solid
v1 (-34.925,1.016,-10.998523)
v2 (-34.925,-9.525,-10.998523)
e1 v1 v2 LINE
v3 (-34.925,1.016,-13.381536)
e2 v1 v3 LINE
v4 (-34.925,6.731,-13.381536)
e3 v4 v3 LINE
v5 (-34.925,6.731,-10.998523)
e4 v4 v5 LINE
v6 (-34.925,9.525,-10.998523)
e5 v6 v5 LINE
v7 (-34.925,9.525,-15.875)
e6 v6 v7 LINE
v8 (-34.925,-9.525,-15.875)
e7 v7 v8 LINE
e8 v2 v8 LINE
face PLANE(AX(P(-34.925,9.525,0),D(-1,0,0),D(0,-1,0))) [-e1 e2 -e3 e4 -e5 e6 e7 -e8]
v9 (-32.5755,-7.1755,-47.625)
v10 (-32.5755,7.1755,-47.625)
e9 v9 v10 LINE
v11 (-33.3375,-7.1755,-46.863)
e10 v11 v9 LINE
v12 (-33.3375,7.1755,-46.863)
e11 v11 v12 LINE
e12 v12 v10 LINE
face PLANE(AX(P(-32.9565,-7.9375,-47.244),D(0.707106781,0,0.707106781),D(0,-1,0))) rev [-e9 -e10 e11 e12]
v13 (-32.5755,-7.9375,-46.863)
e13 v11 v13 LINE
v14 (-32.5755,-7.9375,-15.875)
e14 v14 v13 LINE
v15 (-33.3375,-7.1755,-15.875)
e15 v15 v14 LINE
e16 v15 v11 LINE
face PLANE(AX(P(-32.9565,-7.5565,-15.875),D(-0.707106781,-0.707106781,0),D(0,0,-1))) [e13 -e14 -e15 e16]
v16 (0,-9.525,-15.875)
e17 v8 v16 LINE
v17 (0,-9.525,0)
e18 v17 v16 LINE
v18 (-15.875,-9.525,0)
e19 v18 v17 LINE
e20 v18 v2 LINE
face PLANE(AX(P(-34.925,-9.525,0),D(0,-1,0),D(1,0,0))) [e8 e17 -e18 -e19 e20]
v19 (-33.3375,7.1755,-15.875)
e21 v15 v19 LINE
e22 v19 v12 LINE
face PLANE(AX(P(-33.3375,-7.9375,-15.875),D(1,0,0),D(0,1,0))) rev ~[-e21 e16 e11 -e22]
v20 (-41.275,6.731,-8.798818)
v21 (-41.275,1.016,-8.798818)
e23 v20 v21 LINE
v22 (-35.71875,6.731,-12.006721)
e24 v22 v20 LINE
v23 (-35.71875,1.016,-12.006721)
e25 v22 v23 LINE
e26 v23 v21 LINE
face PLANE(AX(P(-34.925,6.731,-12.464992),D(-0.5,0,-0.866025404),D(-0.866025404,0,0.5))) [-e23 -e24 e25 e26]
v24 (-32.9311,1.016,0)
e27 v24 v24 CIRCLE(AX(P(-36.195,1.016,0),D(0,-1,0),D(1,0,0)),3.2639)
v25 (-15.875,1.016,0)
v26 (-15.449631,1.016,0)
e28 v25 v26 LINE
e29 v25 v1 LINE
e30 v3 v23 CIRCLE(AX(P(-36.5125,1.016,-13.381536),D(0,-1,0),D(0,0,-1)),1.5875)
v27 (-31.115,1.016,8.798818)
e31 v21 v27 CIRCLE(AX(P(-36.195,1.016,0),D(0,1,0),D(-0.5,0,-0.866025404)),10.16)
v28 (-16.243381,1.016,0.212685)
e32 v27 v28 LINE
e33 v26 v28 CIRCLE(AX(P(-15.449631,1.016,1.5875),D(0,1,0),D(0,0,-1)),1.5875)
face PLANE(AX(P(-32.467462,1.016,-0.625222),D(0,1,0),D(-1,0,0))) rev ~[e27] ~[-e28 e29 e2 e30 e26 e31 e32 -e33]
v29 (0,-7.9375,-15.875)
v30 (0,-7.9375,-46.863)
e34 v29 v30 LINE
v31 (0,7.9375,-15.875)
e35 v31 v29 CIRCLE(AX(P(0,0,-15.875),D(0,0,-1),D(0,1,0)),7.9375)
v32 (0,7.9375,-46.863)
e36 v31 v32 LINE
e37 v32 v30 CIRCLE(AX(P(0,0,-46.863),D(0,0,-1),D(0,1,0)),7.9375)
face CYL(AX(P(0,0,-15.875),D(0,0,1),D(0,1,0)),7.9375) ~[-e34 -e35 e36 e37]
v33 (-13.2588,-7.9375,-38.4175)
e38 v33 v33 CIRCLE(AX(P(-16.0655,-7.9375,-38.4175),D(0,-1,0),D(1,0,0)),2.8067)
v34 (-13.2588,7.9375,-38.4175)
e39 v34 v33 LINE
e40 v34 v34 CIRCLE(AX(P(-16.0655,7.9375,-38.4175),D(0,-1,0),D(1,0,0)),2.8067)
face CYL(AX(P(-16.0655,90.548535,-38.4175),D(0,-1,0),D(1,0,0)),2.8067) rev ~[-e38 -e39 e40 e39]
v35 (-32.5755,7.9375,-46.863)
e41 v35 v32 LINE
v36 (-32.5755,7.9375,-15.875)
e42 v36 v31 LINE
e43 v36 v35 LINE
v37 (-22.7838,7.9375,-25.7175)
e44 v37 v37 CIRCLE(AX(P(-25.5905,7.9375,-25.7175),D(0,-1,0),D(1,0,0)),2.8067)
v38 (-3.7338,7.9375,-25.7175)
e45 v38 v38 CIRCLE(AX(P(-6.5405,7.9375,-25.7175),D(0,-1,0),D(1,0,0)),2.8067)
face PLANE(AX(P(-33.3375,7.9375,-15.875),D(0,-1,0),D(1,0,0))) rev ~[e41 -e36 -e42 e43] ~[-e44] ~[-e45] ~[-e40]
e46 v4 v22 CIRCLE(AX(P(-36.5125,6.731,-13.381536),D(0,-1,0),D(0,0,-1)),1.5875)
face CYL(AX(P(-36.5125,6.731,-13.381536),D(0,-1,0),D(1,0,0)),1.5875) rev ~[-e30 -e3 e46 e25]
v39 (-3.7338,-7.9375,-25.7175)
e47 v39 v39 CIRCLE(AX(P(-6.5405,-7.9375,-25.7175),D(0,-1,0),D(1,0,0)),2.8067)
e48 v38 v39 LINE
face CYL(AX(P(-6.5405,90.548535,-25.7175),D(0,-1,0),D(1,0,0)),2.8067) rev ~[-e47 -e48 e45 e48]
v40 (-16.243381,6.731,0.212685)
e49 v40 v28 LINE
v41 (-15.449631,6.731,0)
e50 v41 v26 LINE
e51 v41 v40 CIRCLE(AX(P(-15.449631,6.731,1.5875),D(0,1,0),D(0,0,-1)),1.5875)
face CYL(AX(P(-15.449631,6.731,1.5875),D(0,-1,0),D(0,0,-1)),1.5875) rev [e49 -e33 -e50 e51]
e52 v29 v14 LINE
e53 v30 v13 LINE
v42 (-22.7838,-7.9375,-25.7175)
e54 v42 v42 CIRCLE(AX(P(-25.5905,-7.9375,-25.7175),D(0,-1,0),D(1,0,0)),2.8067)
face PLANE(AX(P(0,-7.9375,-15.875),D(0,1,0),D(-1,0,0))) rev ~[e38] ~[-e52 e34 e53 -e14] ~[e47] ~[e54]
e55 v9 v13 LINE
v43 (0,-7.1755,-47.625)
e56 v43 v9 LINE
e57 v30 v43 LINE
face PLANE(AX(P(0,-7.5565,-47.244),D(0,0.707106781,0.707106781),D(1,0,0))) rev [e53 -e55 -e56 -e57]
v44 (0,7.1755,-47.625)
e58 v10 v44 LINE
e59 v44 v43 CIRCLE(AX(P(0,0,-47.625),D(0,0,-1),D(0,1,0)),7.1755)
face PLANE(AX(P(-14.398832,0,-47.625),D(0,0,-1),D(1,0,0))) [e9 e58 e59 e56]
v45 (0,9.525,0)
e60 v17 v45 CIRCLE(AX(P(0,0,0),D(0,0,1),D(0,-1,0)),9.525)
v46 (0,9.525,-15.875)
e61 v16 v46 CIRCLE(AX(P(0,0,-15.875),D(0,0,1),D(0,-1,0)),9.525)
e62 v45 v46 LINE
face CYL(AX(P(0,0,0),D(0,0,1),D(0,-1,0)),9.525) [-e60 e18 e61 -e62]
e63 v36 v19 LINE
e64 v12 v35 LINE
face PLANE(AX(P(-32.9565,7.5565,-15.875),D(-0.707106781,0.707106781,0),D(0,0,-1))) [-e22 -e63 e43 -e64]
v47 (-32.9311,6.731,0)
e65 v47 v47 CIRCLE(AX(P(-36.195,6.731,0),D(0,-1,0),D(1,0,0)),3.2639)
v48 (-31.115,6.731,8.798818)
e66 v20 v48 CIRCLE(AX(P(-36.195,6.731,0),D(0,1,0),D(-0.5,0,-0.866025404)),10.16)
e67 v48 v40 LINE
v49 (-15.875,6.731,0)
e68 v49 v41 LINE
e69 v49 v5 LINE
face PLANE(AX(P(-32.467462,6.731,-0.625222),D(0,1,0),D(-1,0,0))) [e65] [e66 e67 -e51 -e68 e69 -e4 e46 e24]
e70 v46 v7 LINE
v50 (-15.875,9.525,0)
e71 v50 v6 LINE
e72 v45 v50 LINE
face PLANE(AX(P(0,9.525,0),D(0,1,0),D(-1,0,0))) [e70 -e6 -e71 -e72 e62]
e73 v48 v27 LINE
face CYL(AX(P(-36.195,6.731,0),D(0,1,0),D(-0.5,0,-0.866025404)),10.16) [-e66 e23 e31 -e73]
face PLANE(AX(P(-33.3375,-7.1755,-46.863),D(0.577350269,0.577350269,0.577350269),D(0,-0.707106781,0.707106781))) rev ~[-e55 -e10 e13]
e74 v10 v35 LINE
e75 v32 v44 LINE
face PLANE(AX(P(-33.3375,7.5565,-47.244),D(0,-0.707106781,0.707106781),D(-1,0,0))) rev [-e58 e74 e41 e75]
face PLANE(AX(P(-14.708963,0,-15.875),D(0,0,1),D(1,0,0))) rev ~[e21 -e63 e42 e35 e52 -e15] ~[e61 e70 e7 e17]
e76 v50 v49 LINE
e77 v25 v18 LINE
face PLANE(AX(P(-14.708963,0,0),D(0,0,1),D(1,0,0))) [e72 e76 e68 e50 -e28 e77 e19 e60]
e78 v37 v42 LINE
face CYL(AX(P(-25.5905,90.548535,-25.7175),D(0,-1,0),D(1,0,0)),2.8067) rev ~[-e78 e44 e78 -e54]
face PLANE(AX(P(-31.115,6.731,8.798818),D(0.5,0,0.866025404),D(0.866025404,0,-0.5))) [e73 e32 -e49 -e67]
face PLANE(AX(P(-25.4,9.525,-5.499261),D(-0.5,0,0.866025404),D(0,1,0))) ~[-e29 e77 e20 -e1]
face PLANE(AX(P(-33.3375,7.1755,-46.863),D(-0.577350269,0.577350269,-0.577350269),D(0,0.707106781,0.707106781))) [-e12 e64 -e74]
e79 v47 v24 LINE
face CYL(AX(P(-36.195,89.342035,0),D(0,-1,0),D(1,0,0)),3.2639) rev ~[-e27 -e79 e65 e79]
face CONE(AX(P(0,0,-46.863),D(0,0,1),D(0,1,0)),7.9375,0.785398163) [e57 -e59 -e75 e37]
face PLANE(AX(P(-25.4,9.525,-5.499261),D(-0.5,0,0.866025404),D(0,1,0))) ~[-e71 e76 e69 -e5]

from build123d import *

# Parameters (mm, degrees)
F1_DEPTH = 15.875
F3_DEPTH = 31.75
F4_SIZE2 = 10.9985226281
F4_SIZE  = 19.05
F6_START = -2.794
F6_DEPTH = 5.715
F8_D     = 6.5278
F9_SIZE  = 0.762
F11_D    = 5.6134
F12_R    = 1.5875


with BuildPart() as f1:
    # F0 (on Top) → F1 (new body)
    with BuildSketch(Plane.XY):
        with BuildLine():
            Line((0, 9.525), (-34.925, 9.525))
            Line((-34.925, 9.525), (-34.925, -9.525))
            Line((-34.925, -9.525), (0, -9.525))
            ThreePointArc((0, -9.525), (9.525, 0), (0, 9.525))
        make_face()
    extrude(amount=-F1_DEPTH)

    # F2 (on face) → F3 (join)
    with BuildSketch(Plane(origin=(0, 0, -15.875), x_dir=(1, 0, 0), z_dir=(0, 0, -1))):
        with BuildLine():
            Line((0, 7.9375), (-33.3375, 7.9375))
            Line((-33.3375, 7.9375), (-33.3375, -7.9375))
            Line((-33.3375, -7.9375), (0, -7.9375))
            ThreePointArc((0, -7.9375), (7.9375, 0), (0, 7.9375))
        make_face()
    extrude(amount=F3_DEPTH)

    # F4
    f4_edges = [f1.edges().sort_by_distance(p)[0] for p in [
        (-34.925, 0, 0),
    ]]
    f4_side = f1.faces().sort_by_distance((-13.668751, 0, 0))[0]
    chamfer(f4_edges, length=F4_SIZE, length2=F4_SIZE2, reference=f4_side)

    # F5 (on face) → F6 (join)
    with BuildSketch(Plane(origin=(0, 9.525, 0), x_dir=(-1, 0, 0), z_dir=(0, 1, 0)).offset(F6_START)):
        with BuildLine():
            Line((34.925, -12.4649923118), (41.275, -8.7988181024))
            ThreePointArc((41.275, -8.7988181024), (44.9938181024, 5.08), (31.115, 8.7988181024))
            Line((31.115, 8.7988181024), (15.875, 0))
            Line((15.875, 0), (34.925, -10.9985226281))
            Line((34.925, -10.9985226281), (34.925, -12.4649923118))
        make_face()
    extrude(amount=-F6_DEPTH)

    # F8 (through all)
    with Locations(Plane(origin=(0, 6.731, 0), x_dir=(-1, 0, 0), z_dir=(0, 1, 0))):
        with Locations((36.195, 0)):
            Hole(F8_D / 2)

    # F9
    f9_edges = [f1.edges().sort_by_distance(p)[0] for p in [
        (-16.66875, -7.9375, -47.625),
        (-33.3375, 0, -47.625),
        (-33.3375, -7.9375, -31.75),
        (-33.3375, 7.9375, -31.75),
        (7.9375, 0, -47.625),
        (-16.66875, 7.9375, -47.625),
    ]]
    chamfer(f9_edges, length=F9_SIZE)

    # F11 (through all)
    with Locations(Plane(origin=(0, 7.9375, 0), x_dir=(-1, 0, 0), z_dir=(0, 1, 0))):
        with Locations((25.5905, -25.7175), (6.5405, -25.7175), (16.0655, -38.4175)):
            Hole(F11_D / 2)

    # F12
    f12_edges = [f1.edges().sort_by_distance(p)[0] for p in [
        (-15.875, 3.8735, 0),
        (-34.925, 3.8735, -12.464992),
    ]]
    fillet(f12_edges, radius=F12_R)


solid = f1.part
